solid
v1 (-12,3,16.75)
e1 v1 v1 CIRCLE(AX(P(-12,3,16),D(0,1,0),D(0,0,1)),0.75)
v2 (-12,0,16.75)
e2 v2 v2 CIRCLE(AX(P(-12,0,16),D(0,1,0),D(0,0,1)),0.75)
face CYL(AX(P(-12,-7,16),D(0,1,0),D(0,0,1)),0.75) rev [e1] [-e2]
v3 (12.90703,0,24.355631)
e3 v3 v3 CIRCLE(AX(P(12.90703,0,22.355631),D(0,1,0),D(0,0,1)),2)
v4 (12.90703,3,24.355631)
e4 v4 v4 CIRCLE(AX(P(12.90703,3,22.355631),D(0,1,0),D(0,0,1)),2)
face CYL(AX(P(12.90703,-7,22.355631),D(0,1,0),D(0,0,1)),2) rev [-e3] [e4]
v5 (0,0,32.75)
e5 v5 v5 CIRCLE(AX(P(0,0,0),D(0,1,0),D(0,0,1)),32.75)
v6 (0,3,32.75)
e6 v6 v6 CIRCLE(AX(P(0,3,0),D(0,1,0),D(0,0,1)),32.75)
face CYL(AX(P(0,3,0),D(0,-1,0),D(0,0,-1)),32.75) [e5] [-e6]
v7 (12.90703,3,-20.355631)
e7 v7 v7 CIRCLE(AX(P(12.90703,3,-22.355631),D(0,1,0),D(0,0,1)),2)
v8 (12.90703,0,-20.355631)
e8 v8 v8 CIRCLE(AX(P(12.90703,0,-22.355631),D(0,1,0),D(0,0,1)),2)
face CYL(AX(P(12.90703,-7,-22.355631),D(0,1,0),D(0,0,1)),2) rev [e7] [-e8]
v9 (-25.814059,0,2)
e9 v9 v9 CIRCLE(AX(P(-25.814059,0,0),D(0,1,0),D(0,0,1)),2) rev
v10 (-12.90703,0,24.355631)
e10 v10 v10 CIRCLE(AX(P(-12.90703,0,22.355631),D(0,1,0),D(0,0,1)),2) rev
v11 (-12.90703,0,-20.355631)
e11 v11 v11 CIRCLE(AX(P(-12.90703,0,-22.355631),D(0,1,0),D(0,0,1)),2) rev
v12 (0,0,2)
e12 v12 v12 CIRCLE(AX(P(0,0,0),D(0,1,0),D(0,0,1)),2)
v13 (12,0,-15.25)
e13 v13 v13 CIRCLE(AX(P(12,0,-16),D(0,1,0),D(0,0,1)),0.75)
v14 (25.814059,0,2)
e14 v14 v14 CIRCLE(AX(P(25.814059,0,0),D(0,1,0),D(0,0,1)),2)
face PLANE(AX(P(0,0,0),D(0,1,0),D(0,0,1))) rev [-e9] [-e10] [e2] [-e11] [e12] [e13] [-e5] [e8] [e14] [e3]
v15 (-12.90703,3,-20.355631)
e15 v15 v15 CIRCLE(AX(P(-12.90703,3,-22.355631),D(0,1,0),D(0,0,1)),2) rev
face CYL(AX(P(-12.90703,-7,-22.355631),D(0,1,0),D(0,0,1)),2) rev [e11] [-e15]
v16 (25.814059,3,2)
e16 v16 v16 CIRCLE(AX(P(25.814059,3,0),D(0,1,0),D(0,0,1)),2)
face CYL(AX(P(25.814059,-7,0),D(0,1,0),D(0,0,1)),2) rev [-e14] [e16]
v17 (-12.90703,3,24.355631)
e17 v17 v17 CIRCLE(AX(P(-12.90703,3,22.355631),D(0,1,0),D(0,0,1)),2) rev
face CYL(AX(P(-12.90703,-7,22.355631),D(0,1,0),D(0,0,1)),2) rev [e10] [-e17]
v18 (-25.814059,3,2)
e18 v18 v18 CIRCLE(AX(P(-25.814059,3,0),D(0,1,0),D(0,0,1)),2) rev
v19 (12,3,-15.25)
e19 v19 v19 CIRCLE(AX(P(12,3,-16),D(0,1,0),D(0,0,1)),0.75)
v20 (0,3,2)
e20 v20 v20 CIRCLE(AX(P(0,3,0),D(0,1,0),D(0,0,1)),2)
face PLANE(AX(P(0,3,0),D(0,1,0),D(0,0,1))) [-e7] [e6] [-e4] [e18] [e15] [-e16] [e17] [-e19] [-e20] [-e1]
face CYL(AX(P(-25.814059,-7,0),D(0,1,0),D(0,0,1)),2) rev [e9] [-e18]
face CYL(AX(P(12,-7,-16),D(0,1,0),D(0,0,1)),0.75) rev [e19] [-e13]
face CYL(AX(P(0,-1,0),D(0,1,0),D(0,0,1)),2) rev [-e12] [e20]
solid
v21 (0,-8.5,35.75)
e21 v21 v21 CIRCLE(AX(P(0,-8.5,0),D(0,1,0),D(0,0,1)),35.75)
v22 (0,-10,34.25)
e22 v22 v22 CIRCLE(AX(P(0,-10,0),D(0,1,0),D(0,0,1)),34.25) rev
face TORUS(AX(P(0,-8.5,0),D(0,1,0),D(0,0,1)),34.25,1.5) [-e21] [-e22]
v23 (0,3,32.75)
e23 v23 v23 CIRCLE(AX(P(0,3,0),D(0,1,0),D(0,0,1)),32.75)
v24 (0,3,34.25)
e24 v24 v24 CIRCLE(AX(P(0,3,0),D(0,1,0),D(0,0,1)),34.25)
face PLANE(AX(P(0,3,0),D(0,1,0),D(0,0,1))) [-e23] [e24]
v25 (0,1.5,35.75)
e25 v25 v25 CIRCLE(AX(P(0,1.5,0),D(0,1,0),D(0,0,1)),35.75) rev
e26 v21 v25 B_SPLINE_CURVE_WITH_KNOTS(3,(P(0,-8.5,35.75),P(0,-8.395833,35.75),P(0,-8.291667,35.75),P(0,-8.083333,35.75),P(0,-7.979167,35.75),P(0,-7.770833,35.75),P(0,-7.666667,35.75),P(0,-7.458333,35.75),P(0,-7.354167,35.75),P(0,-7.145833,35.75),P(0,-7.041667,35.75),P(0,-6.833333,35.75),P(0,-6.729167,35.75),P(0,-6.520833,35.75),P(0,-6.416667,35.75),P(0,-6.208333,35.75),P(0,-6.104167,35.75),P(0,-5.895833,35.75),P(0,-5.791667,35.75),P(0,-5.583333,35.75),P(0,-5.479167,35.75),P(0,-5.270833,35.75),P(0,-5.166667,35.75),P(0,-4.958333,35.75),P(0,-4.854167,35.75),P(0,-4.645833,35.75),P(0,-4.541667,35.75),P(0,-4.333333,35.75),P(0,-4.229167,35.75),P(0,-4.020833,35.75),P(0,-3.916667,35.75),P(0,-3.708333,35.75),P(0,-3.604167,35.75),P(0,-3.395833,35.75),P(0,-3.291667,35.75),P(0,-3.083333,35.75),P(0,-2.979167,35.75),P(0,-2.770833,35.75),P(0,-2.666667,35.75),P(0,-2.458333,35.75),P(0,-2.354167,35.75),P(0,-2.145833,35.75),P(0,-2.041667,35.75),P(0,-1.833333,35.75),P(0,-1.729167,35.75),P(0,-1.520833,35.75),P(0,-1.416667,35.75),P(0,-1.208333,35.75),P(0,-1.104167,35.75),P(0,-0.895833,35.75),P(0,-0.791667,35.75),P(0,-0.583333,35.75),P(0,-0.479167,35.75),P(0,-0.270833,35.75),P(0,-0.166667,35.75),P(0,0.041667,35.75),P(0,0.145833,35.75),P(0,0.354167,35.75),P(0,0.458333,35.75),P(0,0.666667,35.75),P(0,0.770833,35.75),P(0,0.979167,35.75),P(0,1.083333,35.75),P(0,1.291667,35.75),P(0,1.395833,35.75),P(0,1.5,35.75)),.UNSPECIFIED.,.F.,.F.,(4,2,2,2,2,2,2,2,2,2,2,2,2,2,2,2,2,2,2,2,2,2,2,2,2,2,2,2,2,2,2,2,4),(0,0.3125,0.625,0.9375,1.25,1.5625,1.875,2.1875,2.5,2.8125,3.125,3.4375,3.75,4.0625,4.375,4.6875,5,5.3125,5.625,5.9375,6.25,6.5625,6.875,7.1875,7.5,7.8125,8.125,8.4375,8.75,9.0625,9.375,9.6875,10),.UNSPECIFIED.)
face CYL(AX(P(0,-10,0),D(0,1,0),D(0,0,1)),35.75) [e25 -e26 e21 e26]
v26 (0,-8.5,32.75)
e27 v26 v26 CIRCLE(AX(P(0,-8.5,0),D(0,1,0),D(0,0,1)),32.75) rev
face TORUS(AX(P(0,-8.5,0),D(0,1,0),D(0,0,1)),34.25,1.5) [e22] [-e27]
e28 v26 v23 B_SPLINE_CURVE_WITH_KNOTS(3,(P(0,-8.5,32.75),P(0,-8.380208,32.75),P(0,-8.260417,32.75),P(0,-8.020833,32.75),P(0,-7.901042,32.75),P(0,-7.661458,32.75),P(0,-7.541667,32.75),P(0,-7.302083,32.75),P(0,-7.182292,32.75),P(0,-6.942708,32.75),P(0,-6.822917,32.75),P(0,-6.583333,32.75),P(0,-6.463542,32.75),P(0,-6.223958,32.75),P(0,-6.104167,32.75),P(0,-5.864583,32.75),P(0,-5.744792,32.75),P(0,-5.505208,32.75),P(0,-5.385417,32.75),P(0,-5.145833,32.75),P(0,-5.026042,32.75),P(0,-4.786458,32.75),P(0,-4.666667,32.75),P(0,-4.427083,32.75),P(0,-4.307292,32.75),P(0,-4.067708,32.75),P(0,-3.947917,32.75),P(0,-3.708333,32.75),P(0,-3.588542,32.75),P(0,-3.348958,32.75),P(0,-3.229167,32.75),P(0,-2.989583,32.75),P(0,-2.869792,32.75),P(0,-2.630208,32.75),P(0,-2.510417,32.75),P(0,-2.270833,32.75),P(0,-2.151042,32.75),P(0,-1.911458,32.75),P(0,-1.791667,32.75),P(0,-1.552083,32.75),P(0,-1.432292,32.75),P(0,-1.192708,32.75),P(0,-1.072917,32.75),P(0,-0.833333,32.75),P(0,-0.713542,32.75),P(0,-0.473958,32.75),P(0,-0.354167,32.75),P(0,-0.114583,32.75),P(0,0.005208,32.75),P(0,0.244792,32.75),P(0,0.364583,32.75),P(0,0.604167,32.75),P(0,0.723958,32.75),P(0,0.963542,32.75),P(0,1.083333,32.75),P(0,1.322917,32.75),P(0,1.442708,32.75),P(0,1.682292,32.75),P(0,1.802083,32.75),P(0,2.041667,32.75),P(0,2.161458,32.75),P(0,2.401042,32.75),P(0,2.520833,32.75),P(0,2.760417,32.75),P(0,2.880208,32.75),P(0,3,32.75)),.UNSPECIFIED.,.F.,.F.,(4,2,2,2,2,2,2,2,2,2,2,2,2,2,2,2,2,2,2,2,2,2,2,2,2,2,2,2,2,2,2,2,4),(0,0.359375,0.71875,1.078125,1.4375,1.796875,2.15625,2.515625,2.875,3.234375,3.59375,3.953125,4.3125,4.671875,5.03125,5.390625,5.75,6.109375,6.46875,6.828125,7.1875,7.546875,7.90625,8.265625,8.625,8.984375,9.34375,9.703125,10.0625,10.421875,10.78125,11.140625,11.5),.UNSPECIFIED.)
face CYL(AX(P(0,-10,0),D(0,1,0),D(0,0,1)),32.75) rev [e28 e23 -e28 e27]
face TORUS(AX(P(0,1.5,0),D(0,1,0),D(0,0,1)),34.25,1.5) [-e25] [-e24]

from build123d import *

# Parameters (mm, degrees)
CROQUIS1_R              = 32.75
SALIENTE_EXTRUIR1_DEPTH = 3
CROQUIS2_R              = 2
CORTAR_EXTRUIR1_DEPTH   = 4
CORTAR_EXTRUIR4_DEPTH   = 10
CROQUIS8_R              = 35.75
CROQUIS8_R_2            = 32.75
SALIENTE_EXTRUIR2_DEPTH = 13
REDONDEO1_R             = 1.5
CROQUIS9_R              = 0.75
CORTAR_EXTRUIR5_DEPTH   = 10


with BuildPart() as part:
    # Croquis1 → Saliente-Extruir1 (new body)
    with BuildSketch(Plane(origin=(0, 0, 0), x_dir=(1, 0, 0), z_dir=(0, 1, 0))):
        with Locations(Location((0, 0, 0), (0, 0, 270))):
            Circle(CROQUIS1_R)
    extrude(amount=SALIENTE_EXTRUIR1_DEPTH)

    # Croquis2 → Cortar-Extruir1 (cut)
    with BuildSketch(Plane(origin=(0, 3, 0), x_dir=(1, 0, 0), z_dir=(0, 1, 0))):
        with Locations(Location((0, 0, 0), (0, 0, 270))):
            Circle(CROQUIS2_R)
    extrude(amount=-CORTAR_EXTRUIR1_DEPTH, mode=Mode.SUBTRACT)

    # Croquis7 → Cortar-Extruir4 (cut)
    with BuildSketch(Plane(origin=(0, 3, 0), x_dir=(1, 0, 0), z_dir=(0, 1, 0))):
        with BuildLine():
            ThreePointArc((-13.907029535, 20.623580122), (-11.907029535, 20.623580122), (-10.907029535, 22.355630929))
            Line((-10.907029535, 22.355630929), (-12.907029535, 22.355630929))
            Line((-12.907029535, 22.355630929), (-13.907029535, 20.623580122))
        make_face()
        with BuildLine():
            Line((-12.907029535, 22.355630929), (-10.907029535, 22.355630929))
            ThreePointArc((-10.907029535, 22.355630929), (-13.907029535, 24.087681737), (-13.907029535, 20.623580122))
            Line((-13.907029535, 20.623580122), (-12.907029535, 22.355630929))
        make_face()
        with BuildLine():
            ThreePointArc((-23.81405907, 0), (-24.082008262, 1), (-24.81405907, 1.732050808))
            Line((-24.81405907, 1.732050808), (-25.81405907, 0))
            Line((-25.81405907, 0), (-24.81405907, -1.732050808))
            ThreePointArc((-24.81405907, -1.732050808), (-24.082008262, -1), (-23.81405907, 0))
        make_face()
        with BuildLine():
            Line((-25.81405907, 0), (-24.81405907, 1.732050808))
            ThreePointArc((-24.81405907, 1.732050808), (-27.81405907, 0), (-24.81405907, -1.732050808))
            Line((-24.81405907, -1.732050808), (-25.81405907, 0))
        make_face()
        with BuildLine():
            ThreePointArc((10.907029535, 22.355630929), (11.907029535, 20.623580122), (13.907029535, 20.623580122))
            Line((13.907029535, 20.623580122), (12.907029535, 22.355630929))
            Line((12.907029535, 22.355630929), (10.907029535, 22.355630929))
        make_face()
        with BuildLine():
            Line((12.907029535, 22.355630929), (13.907029535, 20.623580122))
            ThreePointArc((13.907029535, 20.623580122), (14.639080343, 21.355630929), (14.907029535, 22.355630929))
            ThreePointArc((14.907029535, 22.355630929), (12.907029535, 24.355630929), (10.907029535, 22.355630929))
            Line((10.907029535, 22.355630929), (12.907029535, 22.355630929))
        make_face()
        with BuildLine():
            Line((24.81405907, -1.732050808), (25.81405907, 0))
            Line((25.81405907, 0), (24.81405907, 1.732050808))
            ThreePointArc((24.81405907, 1.732050808), (23.81405907, 0), (24.81405907, -1.732050808))
        make_face()
        with BuildLine():
            Line((24.81405907, 1.732050808), (25.81405907, 0))
            Line((25.81405907, 0), (24.81405907, -1.732050808))
            ThreePointArc((24.81405907, -1.732050808), (26.81405907, -1.732050808), (27.81405907, 0))
            ThreePointArc((27.81405907, 0), (26.81405907, 1.732050808), (24.81405907, 1.732050808))
        make_face()
        with BuildLine():
            ThreePointArc((-13.907029535, -20.623580122), (-13.907029535, -24.087681737), (-10.907029535, -22.355630929))
            Line((-10.907029535, -22.355630929), (-12.907029535, -22.355630929))
            Line((-12.907029535, -22.355630929), (-13.907029535, -20.623580122))
        make_face()
        with BuildLine():
            Line((-12.907029535, -22.355630929), (-10.907029535, -22.355630929))
            ThreePointArc((-10.907029535, -22.355630929), (-11.907029535, -20.623580122), (-13.907029535, -20.623580122))
            Line((-13.907029535, -20.623580122), (-12.907029535, -22.355630929))
        make_face()
        with BuildLine():
            ThreePointArc((14.907029535, -22.355630929), (14.639080343, -21.355630929), (13.907029535, -20.623580122))
            Line((13.907029535, -20.623580122), (12.907029535, -22.355630929))
            Line((12.907029535, -22.355630929), (10.907029535, -22.355630929))
            ThreePointArc((10.907029535, -22.355630929), (12.907029535, -24.355630929), (14.907029535, -22.355630929))
        make_face()
        with BuildLine():
            Line((12.907029535, -22.355630929), (13.907029535, -20.623580122))
            ThreePointArc((13.907029535, -20.623580122), (11.907029535, -20.623580122), (10.907029535, -22.355630929))
            Line((10.907029535, -22.355630929), (12.907029535, -22.355630929))
        make_face()
    extrude(amount=-CORTAR_EXTRUIR4_DEPTH, mode=Mode.SUBTRACT)

    # Croquis9 → Cortar-Extruir5 (cut)
    with BuildSketch(Plane(origin=(0, 3, 0), x_dir=(1, 0, 0), z_dir=(0, 1, 0))):
        with Locations(Location((12, 16, 0), (0, 0, 270))):
            Circle(CROQUIS9_R)
        with Locations(Location((-12, -16, 0), (0, 0, 270))):
            Circle(CROQUIS9_R)
    extrude(amount=-CORTAR_EXTRUIR5_DEPTH, mode=Mode.SUBTRACT)


with BuildPart() as body_2:
    # Croquis8 → Saliente-Extruir2 (new body)
    with BuildSketch(Plane(origin=(0, 3, 0), x_dir=(1, 0, 0), z_dir=(0, 1, 0))):
        with Locations(Location((0, 0, 0), (0, 0, 270))):
            Circle(CROQUIS8_R)
        with Locations(Location((0, 0, 0), (0, 0, 270))):
            Circle(CROQUIS8_R_2, mode=Mode.SUBTRACT)
    extrude(amount=-SALIENTE_EXTRUIR2_DEPTH)

    # Redondeo1
    redondeo1_edges = [body_2.edges().sort_by_distance(p)[0] for p in [
        (0, 3, -35.75),
        (0, -10, -35.75),
        (0, -10, -32.75),
    ]]
    fillet(redondeo1_edges, radius=REDONDEO1_R - 0.0001)  # a hair under: the kernel refuses the full size


solid = Compound([part.part, body_2.part])
